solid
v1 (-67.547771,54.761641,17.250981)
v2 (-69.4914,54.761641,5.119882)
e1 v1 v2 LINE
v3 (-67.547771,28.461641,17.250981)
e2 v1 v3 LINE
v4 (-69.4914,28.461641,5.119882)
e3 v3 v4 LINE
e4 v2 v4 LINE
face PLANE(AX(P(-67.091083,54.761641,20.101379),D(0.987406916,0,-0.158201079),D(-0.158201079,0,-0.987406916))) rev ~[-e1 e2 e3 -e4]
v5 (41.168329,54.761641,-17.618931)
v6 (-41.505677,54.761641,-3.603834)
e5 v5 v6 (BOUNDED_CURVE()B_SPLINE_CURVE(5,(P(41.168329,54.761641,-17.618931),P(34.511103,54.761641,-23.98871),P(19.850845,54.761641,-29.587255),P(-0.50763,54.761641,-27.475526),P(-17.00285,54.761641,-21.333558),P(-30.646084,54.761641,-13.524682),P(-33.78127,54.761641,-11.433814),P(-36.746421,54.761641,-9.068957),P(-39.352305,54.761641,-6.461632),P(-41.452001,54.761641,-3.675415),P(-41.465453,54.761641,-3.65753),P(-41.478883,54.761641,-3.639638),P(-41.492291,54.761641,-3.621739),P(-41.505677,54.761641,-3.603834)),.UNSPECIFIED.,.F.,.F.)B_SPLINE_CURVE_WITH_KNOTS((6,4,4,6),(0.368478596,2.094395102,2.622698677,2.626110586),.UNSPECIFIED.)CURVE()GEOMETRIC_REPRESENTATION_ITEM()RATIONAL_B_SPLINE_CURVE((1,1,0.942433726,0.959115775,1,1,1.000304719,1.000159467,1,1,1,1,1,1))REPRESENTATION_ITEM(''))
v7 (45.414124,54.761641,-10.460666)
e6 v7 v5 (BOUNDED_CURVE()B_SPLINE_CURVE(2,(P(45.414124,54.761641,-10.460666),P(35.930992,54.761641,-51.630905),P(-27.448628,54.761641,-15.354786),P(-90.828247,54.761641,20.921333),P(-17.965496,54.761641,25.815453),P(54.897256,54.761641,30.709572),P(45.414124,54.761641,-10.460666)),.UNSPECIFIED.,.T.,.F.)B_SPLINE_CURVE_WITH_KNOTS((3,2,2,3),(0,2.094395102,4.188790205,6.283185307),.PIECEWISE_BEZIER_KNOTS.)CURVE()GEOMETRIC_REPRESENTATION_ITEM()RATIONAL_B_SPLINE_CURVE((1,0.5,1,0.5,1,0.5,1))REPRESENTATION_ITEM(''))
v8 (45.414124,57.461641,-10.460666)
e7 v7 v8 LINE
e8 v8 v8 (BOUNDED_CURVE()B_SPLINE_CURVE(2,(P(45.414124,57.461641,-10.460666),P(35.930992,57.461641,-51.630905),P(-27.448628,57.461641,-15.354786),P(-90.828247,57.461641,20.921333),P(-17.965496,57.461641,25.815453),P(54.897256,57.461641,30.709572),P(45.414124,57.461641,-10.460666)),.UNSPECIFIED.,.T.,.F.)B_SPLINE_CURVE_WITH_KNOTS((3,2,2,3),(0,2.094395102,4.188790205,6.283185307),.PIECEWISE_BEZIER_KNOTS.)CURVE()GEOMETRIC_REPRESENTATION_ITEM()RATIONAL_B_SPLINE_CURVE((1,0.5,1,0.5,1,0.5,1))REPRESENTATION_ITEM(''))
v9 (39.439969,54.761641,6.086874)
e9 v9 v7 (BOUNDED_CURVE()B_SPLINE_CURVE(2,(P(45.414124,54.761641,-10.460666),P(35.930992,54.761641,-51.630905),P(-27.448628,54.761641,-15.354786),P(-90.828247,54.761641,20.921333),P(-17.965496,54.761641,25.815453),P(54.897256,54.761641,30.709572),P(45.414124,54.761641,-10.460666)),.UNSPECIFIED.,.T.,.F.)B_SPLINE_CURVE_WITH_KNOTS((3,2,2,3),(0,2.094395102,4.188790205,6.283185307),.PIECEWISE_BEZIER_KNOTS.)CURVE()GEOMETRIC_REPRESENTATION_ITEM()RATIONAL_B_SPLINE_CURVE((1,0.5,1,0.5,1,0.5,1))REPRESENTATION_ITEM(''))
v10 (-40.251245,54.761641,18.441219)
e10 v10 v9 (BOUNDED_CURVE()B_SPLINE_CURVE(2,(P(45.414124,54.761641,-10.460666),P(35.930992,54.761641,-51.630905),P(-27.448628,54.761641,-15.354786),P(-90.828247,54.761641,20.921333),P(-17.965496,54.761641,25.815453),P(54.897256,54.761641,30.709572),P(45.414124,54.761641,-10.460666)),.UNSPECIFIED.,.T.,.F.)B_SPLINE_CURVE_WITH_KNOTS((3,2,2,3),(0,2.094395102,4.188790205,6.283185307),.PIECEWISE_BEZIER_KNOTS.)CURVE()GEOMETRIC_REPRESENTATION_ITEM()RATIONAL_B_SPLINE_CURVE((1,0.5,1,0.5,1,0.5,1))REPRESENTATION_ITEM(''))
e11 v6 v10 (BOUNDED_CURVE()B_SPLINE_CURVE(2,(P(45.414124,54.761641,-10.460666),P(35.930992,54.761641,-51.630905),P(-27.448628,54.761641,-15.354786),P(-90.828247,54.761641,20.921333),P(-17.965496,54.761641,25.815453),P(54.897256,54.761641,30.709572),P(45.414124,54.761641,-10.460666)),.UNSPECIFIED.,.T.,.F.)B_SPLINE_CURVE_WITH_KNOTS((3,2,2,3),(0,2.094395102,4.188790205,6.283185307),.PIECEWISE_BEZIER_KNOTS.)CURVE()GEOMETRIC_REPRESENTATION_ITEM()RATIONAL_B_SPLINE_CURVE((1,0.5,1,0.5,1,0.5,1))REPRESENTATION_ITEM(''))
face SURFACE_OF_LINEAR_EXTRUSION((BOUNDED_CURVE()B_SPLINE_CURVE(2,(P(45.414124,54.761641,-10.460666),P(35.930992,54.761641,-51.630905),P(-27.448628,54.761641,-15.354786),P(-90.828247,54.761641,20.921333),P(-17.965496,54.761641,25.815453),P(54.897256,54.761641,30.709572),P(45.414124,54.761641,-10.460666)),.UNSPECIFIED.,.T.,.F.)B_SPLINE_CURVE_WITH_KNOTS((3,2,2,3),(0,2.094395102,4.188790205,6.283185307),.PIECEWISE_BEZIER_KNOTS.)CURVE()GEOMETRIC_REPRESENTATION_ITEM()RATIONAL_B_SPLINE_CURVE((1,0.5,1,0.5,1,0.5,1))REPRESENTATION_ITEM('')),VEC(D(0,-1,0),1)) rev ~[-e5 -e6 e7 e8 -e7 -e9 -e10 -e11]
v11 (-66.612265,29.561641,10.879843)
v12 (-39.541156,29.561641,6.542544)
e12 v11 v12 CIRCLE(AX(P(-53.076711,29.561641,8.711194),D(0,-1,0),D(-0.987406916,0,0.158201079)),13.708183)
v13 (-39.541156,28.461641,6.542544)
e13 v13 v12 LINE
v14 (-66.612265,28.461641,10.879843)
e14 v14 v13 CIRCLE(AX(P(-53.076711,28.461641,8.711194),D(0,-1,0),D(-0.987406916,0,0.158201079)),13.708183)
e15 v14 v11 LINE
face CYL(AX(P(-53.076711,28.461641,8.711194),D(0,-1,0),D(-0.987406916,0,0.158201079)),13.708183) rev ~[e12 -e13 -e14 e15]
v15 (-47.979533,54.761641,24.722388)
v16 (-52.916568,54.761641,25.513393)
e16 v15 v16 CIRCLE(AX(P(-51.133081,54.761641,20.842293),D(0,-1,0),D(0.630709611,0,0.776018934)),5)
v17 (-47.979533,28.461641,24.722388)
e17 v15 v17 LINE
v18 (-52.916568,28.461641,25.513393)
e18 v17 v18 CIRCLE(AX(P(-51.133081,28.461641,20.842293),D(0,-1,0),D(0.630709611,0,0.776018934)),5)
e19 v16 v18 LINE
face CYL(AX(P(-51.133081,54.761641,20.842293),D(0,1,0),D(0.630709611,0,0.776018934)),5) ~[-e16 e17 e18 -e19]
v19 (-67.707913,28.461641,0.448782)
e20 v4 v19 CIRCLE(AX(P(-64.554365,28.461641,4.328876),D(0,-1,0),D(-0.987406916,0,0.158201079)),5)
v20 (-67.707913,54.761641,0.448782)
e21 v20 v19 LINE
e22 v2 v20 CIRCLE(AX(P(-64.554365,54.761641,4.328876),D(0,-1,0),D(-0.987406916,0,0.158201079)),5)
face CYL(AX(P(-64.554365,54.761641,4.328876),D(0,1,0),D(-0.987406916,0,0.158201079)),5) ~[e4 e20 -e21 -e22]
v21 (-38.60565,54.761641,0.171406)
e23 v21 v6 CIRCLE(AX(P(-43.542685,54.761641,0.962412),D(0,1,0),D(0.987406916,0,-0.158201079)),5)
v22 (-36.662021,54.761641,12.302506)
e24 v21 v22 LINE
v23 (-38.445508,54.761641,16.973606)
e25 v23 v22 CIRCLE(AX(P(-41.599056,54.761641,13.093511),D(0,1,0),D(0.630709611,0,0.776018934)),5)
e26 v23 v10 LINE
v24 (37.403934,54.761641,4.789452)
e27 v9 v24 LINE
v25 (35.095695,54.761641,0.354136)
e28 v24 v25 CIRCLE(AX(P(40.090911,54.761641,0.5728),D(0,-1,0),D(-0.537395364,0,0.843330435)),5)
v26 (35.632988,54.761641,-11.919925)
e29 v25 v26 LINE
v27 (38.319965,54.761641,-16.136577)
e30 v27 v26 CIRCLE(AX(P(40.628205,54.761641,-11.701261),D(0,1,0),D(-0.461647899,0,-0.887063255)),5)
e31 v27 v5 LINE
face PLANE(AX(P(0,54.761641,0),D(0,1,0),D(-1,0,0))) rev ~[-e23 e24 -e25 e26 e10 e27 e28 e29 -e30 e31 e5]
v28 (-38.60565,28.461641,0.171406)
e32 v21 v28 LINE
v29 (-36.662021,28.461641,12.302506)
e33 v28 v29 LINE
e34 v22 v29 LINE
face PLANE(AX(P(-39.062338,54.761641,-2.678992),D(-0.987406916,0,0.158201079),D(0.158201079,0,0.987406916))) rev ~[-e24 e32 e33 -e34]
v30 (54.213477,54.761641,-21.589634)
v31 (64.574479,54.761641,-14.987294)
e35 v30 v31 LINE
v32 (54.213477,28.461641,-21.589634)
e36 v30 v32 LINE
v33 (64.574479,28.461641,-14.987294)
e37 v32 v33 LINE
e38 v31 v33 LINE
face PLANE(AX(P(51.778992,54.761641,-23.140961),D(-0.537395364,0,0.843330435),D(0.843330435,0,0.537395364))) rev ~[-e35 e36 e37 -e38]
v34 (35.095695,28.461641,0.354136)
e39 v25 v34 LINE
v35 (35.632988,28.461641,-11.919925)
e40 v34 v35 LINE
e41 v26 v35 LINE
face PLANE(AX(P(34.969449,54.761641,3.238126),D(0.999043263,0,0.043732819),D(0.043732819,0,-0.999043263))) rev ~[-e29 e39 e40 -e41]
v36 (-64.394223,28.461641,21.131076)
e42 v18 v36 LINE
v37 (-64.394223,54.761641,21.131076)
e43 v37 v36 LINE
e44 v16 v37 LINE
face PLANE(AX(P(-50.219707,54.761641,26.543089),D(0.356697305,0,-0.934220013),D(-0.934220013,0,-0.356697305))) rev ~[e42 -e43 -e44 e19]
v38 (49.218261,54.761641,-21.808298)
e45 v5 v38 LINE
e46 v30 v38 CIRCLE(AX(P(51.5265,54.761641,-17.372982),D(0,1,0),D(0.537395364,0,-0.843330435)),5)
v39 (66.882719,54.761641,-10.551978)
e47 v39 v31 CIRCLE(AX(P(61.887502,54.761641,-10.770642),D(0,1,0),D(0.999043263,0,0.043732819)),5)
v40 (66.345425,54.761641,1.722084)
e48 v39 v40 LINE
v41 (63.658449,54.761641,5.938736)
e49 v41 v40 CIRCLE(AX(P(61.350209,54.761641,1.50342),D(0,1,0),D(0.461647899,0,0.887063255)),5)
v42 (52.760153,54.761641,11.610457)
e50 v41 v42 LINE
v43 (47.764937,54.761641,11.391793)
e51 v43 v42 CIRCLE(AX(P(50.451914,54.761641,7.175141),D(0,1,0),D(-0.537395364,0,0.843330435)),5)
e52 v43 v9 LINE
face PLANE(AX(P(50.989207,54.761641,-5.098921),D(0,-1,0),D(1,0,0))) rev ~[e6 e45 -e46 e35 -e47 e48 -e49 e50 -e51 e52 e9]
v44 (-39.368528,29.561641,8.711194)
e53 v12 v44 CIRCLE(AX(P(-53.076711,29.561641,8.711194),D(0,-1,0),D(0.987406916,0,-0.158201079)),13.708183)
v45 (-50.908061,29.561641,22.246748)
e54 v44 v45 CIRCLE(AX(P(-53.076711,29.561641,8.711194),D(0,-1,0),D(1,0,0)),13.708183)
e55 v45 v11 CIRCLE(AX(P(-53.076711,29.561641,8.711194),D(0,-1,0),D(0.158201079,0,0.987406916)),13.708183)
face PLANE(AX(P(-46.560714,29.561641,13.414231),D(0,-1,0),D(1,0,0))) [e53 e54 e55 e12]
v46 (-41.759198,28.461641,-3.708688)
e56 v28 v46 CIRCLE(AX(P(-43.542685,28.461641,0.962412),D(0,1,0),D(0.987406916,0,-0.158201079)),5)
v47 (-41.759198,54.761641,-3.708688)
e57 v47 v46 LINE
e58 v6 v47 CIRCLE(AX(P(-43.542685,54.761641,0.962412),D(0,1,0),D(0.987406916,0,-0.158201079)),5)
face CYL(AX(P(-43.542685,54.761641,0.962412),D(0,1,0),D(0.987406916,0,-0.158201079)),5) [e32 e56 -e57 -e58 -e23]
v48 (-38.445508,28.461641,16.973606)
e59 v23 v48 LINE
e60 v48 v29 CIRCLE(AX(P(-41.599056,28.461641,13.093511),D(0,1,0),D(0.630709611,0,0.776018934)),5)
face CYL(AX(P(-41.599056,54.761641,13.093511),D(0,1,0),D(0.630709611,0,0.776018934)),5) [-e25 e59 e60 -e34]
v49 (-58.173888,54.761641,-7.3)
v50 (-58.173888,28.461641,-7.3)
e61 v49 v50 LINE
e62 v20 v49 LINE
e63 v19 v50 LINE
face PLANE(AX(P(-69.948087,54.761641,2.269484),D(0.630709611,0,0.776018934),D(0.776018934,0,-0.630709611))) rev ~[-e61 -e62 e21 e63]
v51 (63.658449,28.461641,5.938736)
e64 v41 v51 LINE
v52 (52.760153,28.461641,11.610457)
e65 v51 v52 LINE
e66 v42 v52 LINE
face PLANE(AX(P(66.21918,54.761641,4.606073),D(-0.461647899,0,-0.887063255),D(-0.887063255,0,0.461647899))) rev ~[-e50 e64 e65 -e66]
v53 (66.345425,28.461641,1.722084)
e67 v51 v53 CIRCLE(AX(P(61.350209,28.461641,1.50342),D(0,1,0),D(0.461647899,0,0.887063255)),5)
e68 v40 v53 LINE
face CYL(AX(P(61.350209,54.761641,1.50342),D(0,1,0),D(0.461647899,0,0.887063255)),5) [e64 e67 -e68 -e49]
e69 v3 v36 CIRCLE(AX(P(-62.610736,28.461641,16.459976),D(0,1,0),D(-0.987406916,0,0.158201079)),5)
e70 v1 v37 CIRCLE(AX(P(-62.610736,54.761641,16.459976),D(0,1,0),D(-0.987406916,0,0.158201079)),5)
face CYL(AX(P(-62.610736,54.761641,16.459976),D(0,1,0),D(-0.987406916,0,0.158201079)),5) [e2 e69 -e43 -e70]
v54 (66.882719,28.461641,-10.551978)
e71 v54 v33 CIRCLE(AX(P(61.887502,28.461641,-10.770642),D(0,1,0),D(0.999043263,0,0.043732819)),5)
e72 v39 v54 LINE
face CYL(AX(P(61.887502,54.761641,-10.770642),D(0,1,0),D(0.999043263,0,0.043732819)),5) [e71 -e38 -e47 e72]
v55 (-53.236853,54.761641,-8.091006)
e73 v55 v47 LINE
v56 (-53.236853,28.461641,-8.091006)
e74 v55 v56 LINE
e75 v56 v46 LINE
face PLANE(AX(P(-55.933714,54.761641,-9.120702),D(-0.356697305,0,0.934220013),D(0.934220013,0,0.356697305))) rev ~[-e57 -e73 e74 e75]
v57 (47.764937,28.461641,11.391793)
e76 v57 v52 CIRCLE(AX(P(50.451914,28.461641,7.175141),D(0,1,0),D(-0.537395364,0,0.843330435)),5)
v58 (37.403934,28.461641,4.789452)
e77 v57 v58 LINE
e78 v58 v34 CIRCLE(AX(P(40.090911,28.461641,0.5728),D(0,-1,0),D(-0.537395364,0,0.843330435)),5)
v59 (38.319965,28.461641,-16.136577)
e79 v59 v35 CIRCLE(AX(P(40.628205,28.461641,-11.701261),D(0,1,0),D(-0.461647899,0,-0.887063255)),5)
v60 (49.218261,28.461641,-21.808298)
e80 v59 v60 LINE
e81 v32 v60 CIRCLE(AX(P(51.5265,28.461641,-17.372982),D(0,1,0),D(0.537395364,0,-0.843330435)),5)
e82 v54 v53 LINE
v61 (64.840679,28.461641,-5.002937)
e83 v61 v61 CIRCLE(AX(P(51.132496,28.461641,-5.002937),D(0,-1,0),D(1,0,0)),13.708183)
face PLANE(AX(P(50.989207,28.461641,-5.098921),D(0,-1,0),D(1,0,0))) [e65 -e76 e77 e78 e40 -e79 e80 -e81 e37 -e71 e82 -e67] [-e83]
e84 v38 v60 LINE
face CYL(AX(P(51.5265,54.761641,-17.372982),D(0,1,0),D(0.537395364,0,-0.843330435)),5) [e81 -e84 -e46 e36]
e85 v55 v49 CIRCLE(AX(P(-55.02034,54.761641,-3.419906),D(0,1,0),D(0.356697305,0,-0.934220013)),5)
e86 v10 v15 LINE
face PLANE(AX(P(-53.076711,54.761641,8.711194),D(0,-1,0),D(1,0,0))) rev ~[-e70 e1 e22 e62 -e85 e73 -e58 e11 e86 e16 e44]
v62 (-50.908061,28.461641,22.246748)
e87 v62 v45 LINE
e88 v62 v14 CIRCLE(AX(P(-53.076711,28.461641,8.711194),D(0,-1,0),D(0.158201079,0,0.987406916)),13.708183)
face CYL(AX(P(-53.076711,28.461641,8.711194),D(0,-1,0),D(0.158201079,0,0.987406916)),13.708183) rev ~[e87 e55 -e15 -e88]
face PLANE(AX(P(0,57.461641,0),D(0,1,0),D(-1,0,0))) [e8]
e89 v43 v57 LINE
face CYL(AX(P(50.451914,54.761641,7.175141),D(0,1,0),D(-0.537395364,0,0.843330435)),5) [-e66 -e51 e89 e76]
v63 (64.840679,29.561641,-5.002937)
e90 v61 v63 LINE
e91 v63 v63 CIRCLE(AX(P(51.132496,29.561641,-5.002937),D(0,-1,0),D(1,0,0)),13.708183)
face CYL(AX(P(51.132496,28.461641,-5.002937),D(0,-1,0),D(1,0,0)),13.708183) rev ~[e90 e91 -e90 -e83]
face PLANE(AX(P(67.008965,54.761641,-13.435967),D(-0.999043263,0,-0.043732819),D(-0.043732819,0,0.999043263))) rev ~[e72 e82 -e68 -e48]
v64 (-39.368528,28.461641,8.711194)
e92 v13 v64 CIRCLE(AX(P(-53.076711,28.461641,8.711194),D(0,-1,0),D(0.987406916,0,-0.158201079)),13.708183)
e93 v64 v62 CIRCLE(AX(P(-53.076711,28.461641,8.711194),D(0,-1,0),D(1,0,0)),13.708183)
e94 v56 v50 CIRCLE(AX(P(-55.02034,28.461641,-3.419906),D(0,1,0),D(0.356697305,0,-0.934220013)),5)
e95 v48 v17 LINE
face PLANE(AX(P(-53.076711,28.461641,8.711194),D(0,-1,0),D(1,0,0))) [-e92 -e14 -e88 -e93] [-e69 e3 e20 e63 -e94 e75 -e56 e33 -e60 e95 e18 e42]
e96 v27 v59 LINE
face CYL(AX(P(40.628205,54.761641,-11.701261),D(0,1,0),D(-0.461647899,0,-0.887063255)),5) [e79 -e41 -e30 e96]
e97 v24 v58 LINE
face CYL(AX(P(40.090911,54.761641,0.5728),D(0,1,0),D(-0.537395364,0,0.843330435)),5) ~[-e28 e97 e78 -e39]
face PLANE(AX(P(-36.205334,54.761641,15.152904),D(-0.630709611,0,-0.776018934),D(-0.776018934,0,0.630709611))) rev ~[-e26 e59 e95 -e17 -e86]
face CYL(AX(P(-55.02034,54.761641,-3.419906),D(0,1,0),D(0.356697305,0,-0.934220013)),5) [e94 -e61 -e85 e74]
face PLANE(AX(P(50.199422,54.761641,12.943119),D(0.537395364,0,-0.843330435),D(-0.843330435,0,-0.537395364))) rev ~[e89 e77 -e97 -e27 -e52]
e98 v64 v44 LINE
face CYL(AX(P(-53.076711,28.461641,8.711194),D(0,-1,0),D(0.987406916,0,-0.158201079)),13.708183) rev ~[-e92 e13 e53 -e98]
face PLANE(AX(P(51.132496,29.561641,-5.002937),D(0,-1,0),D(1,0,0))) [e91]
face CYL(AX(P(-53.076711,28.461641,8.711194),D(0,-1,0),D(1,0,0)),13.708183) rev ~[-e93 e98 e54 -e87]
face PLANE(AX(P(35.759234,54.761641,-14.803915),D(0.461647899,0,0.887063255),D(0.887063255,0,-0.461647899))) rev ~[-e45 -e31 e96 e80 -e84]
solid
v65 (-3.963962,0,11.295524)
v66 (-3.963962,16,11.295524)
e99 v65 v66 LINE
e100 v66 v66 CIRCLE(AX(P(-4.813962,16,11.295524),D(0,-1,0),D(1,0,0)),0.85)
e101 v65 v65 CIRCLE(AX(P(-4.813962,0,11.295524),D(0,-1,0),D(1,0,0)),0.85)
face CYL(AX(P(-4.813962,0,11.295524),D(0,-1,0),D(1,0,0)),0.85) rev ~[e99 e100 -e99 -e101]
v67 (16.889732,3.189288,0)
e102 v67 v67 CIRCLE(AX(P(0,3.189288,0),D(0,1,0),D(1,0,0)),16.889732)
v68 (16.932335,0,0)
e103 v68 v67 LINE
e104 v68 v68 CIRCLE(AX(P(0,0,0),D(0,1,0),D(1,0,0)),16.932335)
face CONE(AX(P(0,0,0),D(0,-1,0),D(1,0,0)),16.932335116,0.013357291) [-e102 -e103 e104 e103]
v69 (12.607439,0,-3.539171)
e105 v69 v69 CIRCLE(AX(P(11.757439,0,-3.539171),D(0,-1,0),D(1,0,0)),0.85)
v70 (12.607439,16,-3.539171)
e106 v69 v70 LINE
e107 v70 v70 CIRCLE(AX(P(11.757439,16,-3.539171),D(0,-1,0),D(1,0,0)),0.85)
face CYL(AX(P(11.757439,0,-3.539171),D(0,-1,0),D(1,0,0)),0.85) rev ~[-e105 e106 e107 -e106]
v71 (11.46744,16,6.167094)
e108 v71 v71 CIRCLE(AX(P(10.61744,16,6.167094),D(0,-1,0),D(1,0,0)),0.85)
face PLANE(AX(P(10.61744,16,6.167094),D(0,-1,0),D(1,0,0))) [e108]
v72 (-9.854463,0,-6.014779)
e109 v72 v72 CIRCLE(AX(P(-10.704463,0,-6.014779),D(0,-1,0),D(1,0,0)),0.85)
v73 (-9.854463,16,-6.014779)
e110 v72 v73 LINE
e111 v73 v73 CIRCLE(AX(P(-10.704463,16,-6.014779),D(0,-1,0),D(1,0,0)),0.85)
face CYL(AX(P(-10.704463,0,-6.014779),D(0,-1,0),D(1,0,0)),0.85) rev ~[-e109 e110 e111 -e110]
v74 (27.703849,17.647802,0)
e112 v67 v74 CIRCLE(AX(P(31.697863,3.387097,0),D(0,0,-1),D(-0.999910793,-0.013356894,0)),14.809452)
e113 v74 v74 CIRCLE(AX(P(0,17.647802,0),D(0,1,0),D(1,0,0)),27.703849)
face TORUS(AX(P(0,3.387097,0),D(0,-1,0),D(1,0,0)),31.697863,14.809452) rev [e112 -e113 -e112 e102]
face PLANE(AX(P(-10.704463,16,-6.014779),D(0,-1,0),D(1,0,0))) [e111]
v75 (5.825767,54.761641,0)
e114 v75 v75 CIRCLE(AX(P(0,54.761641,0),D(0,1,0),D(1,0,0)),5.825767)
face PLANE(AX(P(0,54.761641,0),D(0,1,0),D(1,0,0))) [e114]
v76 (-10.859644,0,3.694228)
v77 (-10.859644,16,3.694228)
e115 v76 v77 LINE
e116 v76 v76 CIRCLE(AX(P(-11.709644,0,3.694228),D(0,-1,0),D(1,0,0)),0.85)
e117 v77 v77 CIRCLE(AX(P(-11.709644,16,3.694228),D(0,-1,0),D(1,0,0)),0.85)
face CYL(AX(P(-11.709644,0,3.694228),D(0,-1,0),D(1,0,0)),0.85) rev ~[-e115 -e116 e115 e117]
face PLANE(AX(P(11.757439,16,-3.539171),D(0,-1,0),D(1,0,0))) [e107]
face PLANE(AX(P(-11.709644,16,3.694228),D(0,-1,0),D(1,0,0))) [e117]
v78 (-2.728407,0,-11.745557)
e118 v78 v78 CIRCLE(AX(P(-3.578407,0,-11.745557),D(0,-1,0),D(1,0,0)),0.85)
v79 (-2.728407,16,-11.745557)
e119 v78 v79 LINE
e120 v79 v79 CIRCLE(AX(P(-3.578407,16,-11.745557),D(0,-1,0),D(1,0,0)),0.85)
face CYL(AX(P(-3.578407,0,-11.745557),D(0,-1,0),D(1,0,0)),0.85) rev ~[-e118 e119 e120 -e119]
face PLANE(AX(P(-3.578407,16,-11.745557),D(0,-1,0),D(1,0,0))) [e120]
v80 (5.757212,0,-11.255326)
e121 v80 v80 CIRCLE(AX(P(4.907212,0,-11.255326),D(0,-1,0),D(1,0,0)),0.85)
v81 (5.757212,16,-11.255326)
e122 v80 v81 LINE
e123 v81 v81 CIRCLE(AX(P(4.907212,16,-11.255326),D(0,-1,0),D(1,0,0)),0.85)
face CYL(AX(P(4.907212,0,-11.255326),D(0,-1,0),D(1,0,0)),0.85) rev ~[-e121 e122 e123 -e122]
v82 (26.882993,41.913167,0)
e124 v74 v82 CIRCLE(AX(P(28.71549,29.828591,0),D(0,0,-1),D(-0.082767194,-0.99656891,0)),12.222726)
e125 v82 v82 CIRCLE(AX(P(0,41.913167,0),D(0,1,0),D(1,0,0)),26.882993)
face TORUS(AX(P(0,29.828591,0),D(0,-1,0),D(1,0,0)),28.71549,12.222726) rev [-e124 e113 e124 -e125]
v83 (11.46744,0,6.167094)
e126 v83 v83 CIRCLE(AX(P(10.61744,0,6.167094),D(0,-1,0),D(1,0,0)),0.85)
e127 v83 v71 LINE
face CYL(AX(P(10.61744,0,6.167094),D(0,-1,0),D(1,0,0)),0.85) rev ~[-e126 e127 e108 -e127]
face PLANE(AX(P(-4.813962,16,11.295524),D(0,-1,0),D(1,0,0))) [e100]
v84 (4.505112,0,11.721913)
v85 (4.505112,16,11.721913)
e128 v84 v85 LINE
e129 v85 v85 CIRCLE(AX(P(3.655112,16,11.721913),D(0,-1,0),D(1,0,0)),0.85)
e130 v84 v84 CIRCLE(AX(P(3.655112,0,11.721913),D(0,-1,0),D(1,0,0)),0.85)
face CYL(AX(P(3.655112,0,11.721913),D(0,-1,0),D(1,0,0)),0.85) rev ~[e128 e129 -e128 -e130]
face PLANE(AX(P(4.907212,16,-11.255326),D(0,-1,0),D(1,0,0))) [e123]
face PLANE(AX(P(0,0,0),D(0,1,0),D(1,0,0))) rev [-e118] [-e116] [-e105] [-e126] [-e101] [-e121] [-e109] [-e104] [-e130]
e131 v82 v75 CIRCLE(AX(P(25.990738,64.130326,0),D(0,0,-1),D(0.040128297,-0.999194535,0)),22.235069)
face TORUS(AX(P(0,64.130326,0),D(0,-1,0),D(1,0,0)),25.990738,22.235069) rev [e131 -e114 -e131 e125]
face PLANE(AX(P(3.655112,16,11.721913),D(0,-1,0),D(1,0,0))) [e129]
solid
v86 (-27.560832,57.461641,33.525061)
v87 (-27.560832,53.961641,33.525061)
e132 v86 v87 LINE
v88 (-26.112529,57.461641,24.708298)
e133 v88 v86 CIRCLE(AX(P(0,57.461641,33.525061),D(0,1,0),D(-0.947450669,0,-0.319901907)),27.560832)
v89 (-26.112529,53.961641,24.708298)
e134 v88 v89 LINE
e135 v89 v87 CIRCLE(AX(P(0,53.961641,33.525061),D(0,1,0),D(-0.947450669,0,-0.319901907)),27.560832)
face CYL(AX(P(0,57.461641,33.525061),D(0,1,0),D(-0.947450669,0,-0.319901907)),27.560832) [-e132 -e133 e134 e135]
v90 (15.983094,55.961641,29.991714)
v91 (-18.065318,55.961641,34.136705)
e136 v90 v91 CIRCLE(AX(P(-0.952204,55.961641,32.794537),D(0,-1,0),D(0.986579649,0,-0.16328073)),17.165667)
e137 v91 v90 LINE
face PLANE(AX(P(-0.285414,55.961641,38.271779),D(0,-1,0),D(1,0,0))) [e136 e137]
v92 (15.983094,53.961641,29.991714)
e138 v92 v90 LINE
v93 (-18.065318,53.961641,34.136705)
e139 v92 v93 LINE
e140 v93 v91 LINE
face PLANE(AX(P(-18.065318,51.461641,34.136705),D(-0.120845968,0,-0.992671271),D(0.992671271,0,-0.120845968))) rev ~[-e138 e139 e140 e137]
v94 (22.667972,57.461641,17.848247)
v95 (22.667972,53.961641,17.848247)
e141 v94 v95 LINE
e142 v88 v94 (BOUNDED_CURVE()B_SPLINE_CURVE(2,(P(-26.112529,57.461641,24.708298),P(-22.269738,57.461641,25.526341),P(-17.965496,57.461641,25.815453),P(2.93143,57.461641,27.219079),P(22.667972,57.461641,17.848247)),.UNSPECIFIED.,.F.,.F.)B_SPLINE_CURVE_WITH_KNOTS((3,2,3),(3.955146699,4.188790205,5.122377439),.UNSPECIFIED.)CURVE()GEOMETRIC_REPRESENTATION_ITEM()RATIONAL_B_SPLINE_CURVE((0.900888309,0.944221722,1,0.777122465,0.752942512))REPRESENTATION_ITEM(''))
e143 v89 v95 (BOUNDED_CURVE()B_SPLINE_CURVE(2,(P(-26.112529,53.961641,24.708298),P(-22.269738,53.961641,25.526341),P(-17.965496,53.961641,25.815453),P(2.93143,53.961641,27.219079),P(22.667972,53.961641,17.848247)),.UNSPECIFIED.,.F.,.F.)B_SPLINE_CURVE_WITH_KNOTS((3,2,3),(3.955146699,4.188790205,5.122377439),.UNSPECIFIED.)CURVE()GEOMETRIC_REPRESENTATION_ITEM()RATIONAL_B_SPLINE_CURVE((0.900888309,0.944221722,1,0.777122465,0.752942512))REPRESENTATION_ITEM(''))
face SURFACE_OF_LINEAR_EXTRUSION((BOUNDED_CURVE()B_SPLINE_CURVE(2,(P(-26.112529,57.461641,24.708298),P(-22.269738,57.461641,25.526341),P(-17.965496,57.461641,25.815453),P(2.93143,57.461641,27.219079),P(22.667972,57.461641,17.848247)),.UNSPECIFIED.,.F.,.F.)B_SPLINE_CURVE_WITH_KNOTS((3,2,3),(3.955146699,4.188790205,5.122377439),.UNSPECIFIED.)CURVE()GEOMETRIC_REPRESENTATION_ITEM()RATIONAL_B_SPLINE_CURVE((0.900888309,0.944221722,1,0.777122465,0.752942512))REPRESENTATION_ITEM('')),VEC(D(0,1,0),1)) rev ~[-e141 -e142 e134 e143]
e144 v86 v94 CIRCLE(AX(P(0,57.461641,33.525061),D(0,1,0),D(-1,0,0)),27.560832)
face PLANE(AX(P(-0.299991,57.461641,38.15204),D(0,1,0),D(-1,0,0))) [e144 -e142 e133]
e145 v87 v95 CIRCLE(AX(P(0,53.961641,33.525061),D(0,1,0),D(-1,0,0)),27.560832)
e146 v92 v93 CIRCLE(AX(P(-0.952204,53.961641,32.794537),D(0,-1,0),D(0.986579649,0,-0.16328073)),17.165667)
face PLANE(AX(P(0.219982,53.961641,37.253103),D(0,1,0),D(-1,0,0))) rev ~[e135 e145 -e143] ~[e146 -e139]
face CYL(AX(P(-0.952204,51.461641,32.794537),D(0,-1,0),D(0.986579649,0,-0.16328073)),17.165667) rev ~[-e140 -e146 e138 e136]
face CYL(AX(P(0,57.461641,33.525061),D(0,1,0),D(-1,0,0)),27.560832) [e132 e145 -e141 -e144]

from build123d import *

# Parameters (mm, degrees)
F2_R         = 0.85
F3_DEPTH     = 16
F5_DEPTH     = 2.7
F7_DEPTH     = 25
F8_DEPTH     = 26.3
F9_DEPTH     = 25
F10_R        = 13.7081830223
F11_DEPTH    = 1.1
F12_T1_DEPTH = 26.3
F14_DEPTH    = 3.5
F16_DEPTH    = 6
F18_DEPTH    = 4.5


# Not quite as in the source:
# - a fillet or chamfer that OpenCascade refuses, or shapes differently, is made with other operations: its cross-section is extruded or revolved along the edge and cut away or added


with BuildPart() as f1:
    # F0 (on Top) → F1 (revolve)
    with BuildSketch(Plane.XY):
        with BuildLine():
            Line((0, 54.7616407275), (0, 0))
            Line((0, 0), (16.932335116, 0))
            Line((16.932335116, 0), (16.889732331, 3.1892883126))
            ThreePointArc((16.889732331, 3.1892883126), (19.8385918672, 12.257133335), (27.7038493693, 17.6478021561))
            ThreePointArc((27.7038493693, 17.6478021561), (16.4997519425, 29.4153527913), (26.8829930574, 41.9131666422))
            ThreePointArc((26.8829930574, 41.9131666422), (14.4092780208, 45.1495967178), (5.8257672936, 54.7616407275))
            Line((5.8257672936, 54.7616407275), (0, 54.7616407275))
        make_face()
    revolve(axis=Axis((0, 27.3808203638, 0), (0, 1, 0)))

    # F2 (on face) → F3 (cut)
    with BuildSketch(Plane.XZ):
        with Locations((-4.8139616118, 11.2955241897)):
            Circle(F2_R)
        with Locations((10.6174404705, 6.1670942083)):
            Circle(F2_R)
        with Locations((11.7574385329, -3.5391711268)):
            Circle(F2_R)
        with Locations((4.9072117267, -11.2553261254)):
            Circle(F2_R)
        with Locations((-10.7044627297, -6.0147793632)):
            Circle(F2_R)
        with Locations((-11.7096443523, 3.6942282364)):
            Circle(F2_R)
        with Locations((3.655111995, 11.7219132152)):
            Circle(F2_R)
        with Locations((-3.5784066248, -11.7455565704)):
            Circle(F2_R)
    extrude(amount=-F3_DEPTH, mode=Mode.SUBTRACT)


with BuildPart() as f5:
    # F4 (on face) → F5 (new body)
    with BuildSketch(Plane(origin=(0, 54.7616407275, 0), x_dir=(-1, 0, 0), z_dir=(0, 1, 0))):
        with BuildLine():
            add(Edge.make_bspline(
                [(-45.4141236842, -10.4606663808), (-35.9309916009, -51.6309052226), (27.4486278837, -15.3547862305), (90.8282473683, 20.9213327616), (17.9654958005, 25.8154526113), (-54.8972557674, 30.7095724609), (-45.4141236842, -10.4606663808)],
                knots=[0, 0, 0, 2.0943951024, 2.0943951024, 4.1887902048, 4.1887902048, 6.2831853072, 6.2831853072, 6.2831853072], degree=2, weights=[1, 0.5, 1, 0.5, 1, 0.5, 1]))
        make_face()
    extrude(amount=F5_DEPTH)

    # F6 (on face) → F7 (join)
    with BuildSketch(Plane.XZ.offset(-54.7616407275)):
        Polygon((51.7789917849, -23.1409610529), (67.008964544, -13.4359671261), (66.2191796394, 4.6060731456), (50.1994219757, 12.9431194905), (34.9694492166, 3.2381255638), (35.7592341212, -14.8039147079), align=None)
        Polygon((-55.9337141872, -9.1207021053), (-39.0623376148, -2.6789919353), (-36.2053339796, 15.1529038582), (-50.2197069168, 26.5430894817), (-67.0910834892, 20.1013793117), (-69.9480871244, 2.2694835183), align=None)
    extrude(amount=F7_DEPTH)

    # F6 (on face) → F8 (join)
    with BuildSketch(Plane.XZ.offset(-54.7616407275)):
        Polygon((51.7789917849, -23.1409610529), (67.008964544, -13.4359671261), (66.2191796394, 4.6060731456), (50.1994219757, 12.9431194905), (34.9694492166, 3.2381255638), (35.7592341212, -14.8039147079), align=None)
        Polygon((-55.9337141872, -9.1207021053), (-39.0623376148, -2.6789919353), (-36.2053339796, 15.1529038582), (-50.2197069168, 26.5430894817), (-67.0910834892, 20.1013793117), (-69.9480871244, 2.2694835183), align=None)
    extrude(amount=F8_DEPTH)

    # F6 (on face) → F9 (join)
    with BuildSketch(Plane.XZ.offset(-54.7616407275)):
        Polygon((51.7789917849, -23.1409610529), (67.008964544, -13.4359671261), (66.2191796394, 4.6060731456), (50.1994219757, 12.9431194905), (34.9694492166, 3.2381255638), (35.7592341212, -14.8039147079), align=None)
        Polygon((-55.9337141872, -9.1207021053), (-39.0623376148, -2.6789919353), (-36.2053339796, 15.1529038582), (-50.2197069168, 26.5430894817), (-67.0910834892, 20.1013793117), (-69.9480871244, 2.2694835183), align=None)
    extrude(amount=F9_DEPTH)

    # F10 (on face) → F11 (cut)
    with BuildSketch(Plane.XZ.offset(-28.4616407275)):
        with BuildLine():
            ThreePointArc((-39.3685275296, 8.7111936882), (-42.6449675564, 17.6046193413), (-50.9080612108, 22.2467484167))
            Line((-50.9080612108, 22.2467484167), (-53.076710552, 8.7111936882))
            Line((-53.076710552, 8.7111936882), (-39.5411558234, 6.5425443471))
            ThreePointArc((-39.5411558234, 6.5425443471), (-39.4117527529, 7.6234390637), (-39.3685275296, 8.7111936882))
        make_face()
        with BuildLine():
            Line((-53.076710552, 8.7111936882), (-50.9080612108, 22.2467484167))
            ThreePointArc((-50.9080612108, 22.2467484167), (-61.1143264325, 19.815742879), (-66.6122652805, 10.8798430294))
            Line((-66.6122652805, 10.8798430294), (-53.076710552, 8.7111936882))
        make_face()
        with BuildLine():
            Line((-39.5411558234, 6.5425443471), (-53.076710552, 8.7111936882))
            Line((-53.076710552, 8.7111936882), (-55.2453598931, -4.8243610403))
            ThreePointArc((-55.2453598931, -4.8243610403), (-45.0390946715, -2.3933555026), (-39.5411558234, 6.5425443471))
        make_face()
        with BuildLine():
            Line((-55.2453598931, -4.8243610403), (-53.076710552, 8.7111936882))
            Line((-53.076710552, 8.7111936882), (-66.6122652805, 10.8798430294))
            ThreePointArc((-66.6122652805, 10.8798430294), (-64.1812597428, 0.6735778077), (-55.2453598931, -4.8243610403))
        make_face()
        with Locations((51.1324964464, -5.002936814)):
            Circle(F10_R)
    extrude(amount=-F11_DEPTH, mode=Mode.SUBTRACT)

    # F12: fillet of radius 5 on 12 edges, made by hand

    # F12_s2 → F12_t1 (cut)
    with BuildSketch(Plane.XZ.offset(-54.7616407275)):
        with BuildLine():
            ThreePointArc((54.2134770538, -21.589634263), (51.7451643314, -22.3681983999), (49.2182607409, -21.8082983598))
            Line((49.2182607409, -21.8082983598), (49.172095951, -21.8970046852))
            Line((49.172095951, -21.8970046852), (51.7840416159, -23.2563206322))
            Line((51.7840416159, -23.2563206322), (54.2672165902, -21.6739673066))
            Line((54.2672165902, -21.6739673066), (54.2134770538, -21.589634263))
        make_face()
        with BuildLine():
            ThreePointArc((38.3199651652, -16.136577401), (36.411552483, -14.3882379474), (35.6329883461, -11.919925225))
            Line((35.6329883461, -11.919925225), (35.5330840199, -11.9242985069))
            Line((35.5330840199, -11.9242985069), (35.6618547105, -14.8659677795))
            Line((35.6618547105, -14.8659677795), (38.2738003754, -16.2252837265))
            Line((38.2738003754, -16.2252837265), (38.3199651652, -16.136577401))
        make_face()
        with BuildLine():
            ThreePointArc((66.8827187689, -10.5519776432), (66.3228187287, -13.0788812337), (64.5744792751, -14.9872939159))
            Line((64.5744792751, -14.9872939159), (64.6282188115, -15.0716269595))
            Line((64.6282188115, -15.0716269595), (67.1113937858, -13.4892736338))
            Line((67.1113937858, -13.4892736338), (66.9826230952, -10.5476043613))
            Line((66.9826230952, -10.5476043613), (66.8827187689, -10.5519776432))
        make_face()
        with BuildLine():
            ThreePointArc((63.6584485954, 5.9387358387), (65.5668612776, 4.190396385), (66.3454254145, 1.7220836627))
            Line((66.3454254145, 1.7220836627), (66.4453297408, 1.7264569446))
            Line((66.4453297408, 1.7264569446), (66.3165590502, 4.6681262172))
            Line((66.3165590502, 4.6681262172), (63.7046133853, 6.0274421641))
            Line((63.7046133853, 6.0274421641), (63.6584485954, 5.9387358387))
        make_face()
        with BuildLine():
            ThreePointArc((47.7649367068, 11.3917927007), (50.2332494292, 12.1703568376), (52.7601530198, 11.6104567974))
            Line((52.7601530198, 11.6104567974), (52.8063178096, 11.6991631229))
            Line((52.8063178096, 11.6991631229), (50.1943721447, 13.0584790698))
            Line((50.1943721447, 13.0584790698), (47.7111971705, 11.4761257442))
            Line((47.7111971705, 11.4761257442), (47.7649367068, 11.3917927007))
        make_face()
        with BuildLine():
            ThreePointArc((37.4039344856, 4.7894523536), (35.6555950319, 2.8810396714), (35.0956949918, 0.3541360809))
            Line((35.0956949918, 0.3541360809), (34.9957906655, 0.3497627989))
            Line((34.9957906655, 0.3497627989), (34.8670199749, 3.2914320715))
            Line((34.8670199749, 3.2914320715), (37.3501949492, 4.8737853971))
            Line((37.3501949492, 4.8737853971), (37.4039344856, 4.7894523536))
        make_face()
        with BuildLine():
            ThreePointArc((-53.2368533076, -8.0910056794), (-55.811345227, -8.3569401974), (-58.1738878899, -7.3000002859))
            Line((-58.1738878899, -7.3000002859), (-58.2369588511, -7.3776021794))
            Line((-58.2369588511, -7.3776021794), (-55.9519816743, -9.2347180351))
            Line((-55.9519816743, -9.2347180351), (-53.2011835771, -8.1844276807))
            Line((-53.2011835771, -8.1844276807), (-53.2368533076, -8.0910056794))
        make_face()
        with BuildLine():
            ThreePointArc((-69.4913999475, 5.1198817634), (-69.2254654296, 2.545389844), (-67.7079134216, 0.448781699))
            Line((-67.7079134216, 0.448781699), (-67.7709843828, 0.3711798055))
            Line((-67.7709843828, 0.3711798055), (-70.0559615596, 2.2282956612))
            Line((-70.0559615596, 2.2282956612), (-69.5901406391, 5.1357018713))
            Line((-69.5901406391, 5.1357018713), (-69.4913999475, 5.1198817634))
        make_face()
        with BuildLine():
            ThreePointArc((-38.6056504379, 0.1714063098), (-39.6625903494, -2.1911363532), (-41.7591984944, -3.7086883611))
            Line((-41.7591984944, -3.7086883611), (-41.7235287639, -3.8021103624))
            Line((-41.7235287639, -3.8021103624), (-38.9727306667, -2.7518200081))
            Line((-38.9727306667, -2.7518200081), (-38.5069097463, 0.1555862019))
            Line((-38.5069097463, 0.1555862019), (-38.6056504379, 0.1714063098))
        make_face()
        with BuildLine():
            ThreePointArc((-38.4455076823, 16.9736056775), (-36.9279556744, 14.8769975324), (-36.6620211565, 12.302505613))
            Line((-36.6620211565, 12.302505613), (-36.5632804648, 12.2866855052))
            Line((-36.5632804648, 12.2866855052), (-36.0974595444, 15.1940917152))
            Line((-36.0974595444, 15.1940917152), (-38.3824367212, 17.0512075709))
            Line((-38.3824367212, 17.0512075709), (-38.4455076823, 16.9736056775))
        make_face()
        with BuildLine():
            ThreePointArc((-47.979533214, 24.7223876624), (-50.342075877, 25.7793275738), (-52.9165677964, 25.5133930559))
            Line((-52.9165677964, 25.5133930559), (-52.9522375269, 25.6068150572))
            Line((-52.9522375269, 25.6068150572), (-50.2014394297, 26.6571054115))
            Line((-50.2014394297, 26.6571054115), (-47.9164622529, 24.7999895558))
            Line((-47.9164622529, 24.7999895558), (-47.979533214, 24.7223876624))
        make_face()
        with BuildLine():
            ThreePointArc((-67.547770666, 17.2509810666), (-66.4908307546, 19.6135237296), (-64.3942226095, 21.1310757376))
            Line((-64.3942226095, 21.1310757376), (-64.4298923401, 21.2244977389))
            Line((-64.4298923401, 21.2244977389), (-67.1806904373, 20.1742073845))
            Line((-67.1806904373, 20.1742073845), (-67.6465113577, 17.2668011745))
            Line((-67.6465113577, 17.2668011745), (-67.547770666, 17.2509810666))
        make_face()
    extrude(amount=F12_T1_DEPTH, mode=Mode.SUBTRACT)


with BuildPart() as f14:
    # F13 (on face) → F14 (new body)
    with BuildSketch(Plane(origin=(0, 57.4616407275, 0), x_dir=(-1, 0, 0), z_dir=(0, 1, 0))):
        with BuildLine():
            ThreePointArc((26.1125288837, 24.7082980765), (27.1963462363, 29.0575982583), (27.5608321849, 33.5250608623))
            ThreePointArc((27.5608321849, 33.5250608623), (-8.2113121209, 59.8342574289), (-22.6679721802, 17.8482465187))
            add(Edge.make_bspline(
                [(26.1125288837, 24.7082980765), (22.269737855, 25.5263408769), (17.9654958005, 25.8154526113), (-2.9314299342, 27.2190787005), (-22.6679721802, 17.8482465187)],
                knots=[3.9551466985, 3.9551466985, 3.9551466985, 4.1887902048, 4.1887902048, 5.1223774391, 5.1223774391, 5.1223774391], degree=2, weights=[0.9008883085, 0.9442217216, 1, 0.7771224653, 0.7529425125]))
        make_face()
    extrude(amount=-F14_DEPTH)

    # F15 (on face) → F16 (join)
    with BuildSketch(Plane(origin=(0, 57.4616407275, 0), x_dir=(-1, 0, 0), z_dir=(0, 1, 0))):
        with BuildLine():
            Line((-15.9830935299, 29.9917142838), (18.0653184652, 34.1367051005))
            ThreePointArc((18.0653184652, 34.1367051005), (-1.0872723755, 49.5475111585), (-15.9830935299, 29.9917142838))
        make_face()
    extrude(amount=-F16_DEPTH)

    # F17 (on face) → F18 (cut)
    with BuildSketch(Plane.XZ.offset(-51.4616407275)):
        with BuildLine():
            Line((-18.0653184652, 34.1367051005), (15.9830935299, 29.9917142838))
            ThreePointArc((15.9830935299, 29.9917142838), (1.1221978062, 49.8344009265), (-18.0653184652, 34.1367051005))
        make_face()
    extrude(amount=-F18_DEPTH, mode=Mode.SUBTRACT)


solid = Compound([f1.part, f5.part, f14.part])
